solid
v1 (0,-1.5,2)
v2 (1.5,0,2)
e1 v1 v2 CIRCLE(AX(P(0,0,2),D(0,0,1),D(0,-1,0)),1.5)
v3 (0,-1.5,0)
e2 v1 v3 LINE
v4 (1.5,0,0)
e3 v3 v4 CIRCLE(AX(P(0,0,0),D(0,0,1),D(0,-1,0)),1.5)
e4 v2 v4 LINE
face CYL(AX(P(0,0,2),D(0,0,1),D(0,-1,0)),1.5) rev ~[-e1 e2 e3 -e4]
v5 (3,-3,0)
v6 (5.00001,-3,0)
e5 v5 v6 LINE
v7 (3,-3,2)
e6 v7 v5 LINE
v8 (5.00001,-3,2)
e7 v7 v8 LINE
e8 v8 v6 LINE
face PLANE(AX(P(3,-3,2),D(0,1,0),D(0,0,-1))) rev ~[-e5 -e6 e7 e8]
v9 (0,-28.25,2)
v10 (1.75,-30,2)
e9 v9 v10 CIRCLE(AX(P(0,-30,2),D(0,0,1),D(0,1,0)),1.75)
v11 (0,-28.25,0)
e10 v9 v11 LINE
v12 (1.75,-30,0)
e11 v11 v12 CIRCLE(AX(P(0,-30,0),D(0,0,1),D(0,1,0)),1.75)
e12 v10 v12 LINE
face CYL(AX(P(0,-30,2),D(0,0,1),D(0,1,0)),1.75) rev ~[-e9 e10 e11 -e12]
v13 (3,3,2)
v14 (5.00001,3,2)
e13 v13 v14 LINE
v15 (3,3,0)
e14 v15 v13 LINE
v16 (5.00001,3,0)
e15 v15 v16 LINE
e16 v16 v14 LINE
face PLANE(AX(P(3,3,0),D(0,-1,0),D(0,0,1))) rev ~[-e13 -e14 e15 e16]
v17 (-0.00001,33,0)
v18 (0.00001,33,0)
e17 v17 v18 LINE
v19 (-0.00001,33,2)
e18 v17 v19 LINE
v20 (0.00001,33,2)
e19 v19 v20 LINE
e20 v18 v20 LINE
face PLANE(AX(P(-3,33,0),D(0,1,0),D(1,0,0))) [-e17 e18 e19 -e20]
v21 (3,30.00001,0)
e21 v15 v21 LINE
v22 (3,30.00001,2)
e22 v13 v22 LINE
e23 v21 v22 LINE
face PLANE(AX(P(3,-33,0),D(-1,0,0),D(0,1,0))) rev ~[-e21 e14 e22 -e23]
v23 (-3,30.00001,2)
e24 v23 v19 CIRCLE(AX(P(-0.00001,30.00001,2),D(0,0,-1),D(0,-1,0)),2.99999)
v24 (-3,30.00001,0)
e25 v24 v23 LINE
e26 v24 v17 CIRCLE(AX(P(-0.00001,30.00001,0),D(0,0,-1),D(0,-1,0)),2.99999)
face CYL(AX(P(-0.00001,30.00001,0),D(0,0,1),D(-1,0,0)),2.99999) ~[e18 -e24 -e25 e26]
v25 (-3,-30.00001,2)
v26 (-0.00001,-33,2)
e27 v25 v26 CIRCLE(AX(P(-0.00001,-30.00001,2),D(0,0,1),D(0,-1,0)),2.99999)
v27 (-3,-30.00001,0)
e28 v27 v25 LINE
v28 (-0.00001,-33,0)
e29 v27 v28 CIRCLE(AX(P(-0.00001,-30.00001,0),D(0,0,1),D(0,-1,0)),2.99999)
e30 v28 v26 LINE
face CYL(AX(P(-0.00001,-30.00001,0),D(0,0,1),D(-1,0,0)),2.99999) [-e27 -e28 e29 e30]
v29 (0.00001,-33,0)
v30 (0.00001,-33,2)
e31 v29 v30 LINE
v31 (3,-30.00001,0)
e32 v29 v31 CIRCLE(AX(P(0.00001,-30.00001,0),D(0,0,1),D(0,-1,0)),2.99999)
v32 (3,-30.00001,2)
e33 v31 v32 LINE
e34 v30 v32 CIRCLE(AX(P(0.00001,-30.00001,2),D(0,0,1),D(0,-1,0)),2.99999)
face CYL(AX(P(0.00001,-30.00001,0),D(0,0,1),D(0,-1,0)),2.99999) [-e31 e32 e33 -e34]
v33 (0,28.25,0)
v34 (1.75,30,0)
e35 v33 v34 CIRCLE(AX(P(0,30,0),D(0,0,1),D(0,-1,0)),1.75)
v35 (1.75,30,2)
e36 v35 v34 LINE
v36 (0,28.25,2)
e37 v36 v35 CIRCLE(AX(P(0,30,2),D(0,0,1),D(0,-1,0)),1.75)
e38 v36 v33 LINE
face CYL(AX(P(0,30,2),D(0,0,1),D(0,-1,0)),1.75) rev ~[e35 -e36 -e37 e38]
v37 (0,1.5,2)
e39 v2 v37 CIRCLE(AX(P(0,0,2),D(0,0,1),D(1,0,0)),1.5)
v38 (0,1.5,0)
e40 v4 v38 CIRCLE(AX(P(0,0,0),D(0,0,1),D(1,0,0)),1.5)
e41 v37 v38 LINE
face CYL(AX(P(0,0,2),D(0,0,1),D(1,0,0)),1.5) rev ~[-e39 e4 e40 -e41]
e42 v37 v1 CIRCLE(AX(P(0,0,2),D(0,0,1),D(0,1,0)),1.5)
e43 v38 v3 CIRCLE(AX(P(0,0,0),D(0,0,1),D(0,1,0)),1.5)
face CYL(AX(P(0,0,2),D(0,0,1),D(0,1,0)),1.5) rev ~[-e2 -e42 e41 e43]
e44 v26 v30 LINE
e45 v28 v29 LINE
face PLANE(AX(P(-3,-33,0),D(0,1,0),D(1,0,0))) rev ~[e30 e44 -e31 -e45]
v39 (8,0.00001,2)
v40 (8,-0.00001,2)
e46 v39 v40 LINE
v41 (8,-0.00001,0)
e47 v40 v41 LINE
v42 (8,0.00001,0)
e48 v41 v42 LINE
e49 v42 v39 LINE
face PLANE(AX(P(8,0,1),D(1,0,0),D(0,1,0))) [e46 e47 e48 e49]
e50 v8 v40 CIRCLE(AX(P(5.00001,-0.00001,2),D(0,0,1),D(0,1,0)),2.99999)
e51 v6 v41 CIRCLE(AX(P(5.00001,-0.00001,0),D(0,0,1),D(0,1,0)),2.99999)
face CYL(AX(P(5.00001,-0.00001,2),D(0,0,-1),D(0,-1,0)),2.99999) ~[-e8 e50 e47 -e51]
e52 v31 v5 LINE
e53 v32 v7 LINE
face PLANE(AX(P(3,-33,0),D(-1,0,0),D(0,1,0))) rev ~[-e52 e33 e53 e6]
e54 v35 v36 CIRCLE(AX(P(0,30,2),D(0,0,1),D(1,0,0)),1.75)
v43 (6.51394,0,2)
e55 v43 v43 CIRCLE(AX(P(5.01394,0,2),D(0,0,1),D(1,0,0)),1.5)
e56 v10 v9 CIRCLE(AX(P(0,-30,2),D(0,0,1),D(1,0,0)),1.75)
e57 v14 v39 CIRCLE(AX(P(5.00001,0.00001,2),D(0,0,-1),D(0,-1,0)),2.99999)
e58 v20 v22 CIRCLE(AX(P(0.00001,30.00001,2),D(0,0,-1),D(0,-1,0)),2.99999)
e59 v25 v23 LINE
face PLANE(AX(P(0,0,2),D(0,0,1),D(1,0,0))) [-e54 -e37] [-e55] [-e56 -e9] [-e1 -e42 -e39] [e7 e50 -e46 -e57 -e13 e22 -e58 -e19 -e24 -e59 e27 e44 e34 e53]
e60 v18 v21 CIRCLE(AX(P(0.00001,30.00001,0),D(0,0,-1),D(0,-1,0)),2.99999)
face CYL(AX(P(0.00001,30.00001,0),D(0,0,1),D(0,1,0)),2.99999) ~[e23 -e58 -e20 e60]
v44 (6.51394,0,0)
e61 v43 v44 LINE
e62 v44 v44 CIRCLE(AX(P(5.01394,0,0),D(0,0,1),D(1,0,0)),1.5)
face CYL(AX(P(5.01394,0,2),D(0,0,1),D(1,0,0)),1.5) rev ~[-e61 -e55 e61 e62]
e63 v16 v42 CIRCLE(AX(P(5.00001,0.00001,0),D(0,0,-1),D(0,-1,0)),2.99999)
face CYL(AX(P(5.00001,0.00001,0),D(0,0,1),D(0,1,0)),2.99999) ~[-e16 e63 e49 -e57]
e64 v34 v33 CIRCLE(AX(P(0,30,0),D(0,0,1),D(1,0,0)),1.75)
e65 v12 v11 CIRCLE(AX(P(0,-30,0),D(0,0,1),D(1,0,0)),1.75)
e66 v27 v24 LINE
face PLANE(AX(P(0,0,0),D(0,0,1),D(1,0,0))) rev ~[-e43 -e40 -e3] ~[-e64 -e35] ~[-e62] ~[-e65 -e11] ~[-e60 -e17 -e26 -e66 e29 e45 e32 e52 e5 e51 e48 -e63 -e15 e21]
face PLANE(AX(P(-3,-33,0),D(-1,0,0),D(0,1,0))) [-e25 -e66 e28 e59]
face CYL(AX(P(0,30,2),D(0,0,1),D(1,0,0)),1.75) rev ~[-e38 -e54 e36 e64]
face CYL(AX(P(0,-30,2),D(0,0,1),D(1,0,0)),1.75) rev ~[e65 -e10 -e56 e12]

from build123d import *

# Parameters (mm, degrees)
F0_W     = 6
F0_H     = 66
F1_DEPTH = 2
F3_DEPTH = 2
F5_DEPTH = 5
F6_R     = 1.5
F7_DEPTH = 2
F8_R     = 2.99999


# Not quite as in the source:
# - a fillet or chamfer is up to 0.001 mm smaller than in the source, because OpenCascade refuses the exact size


with BuildPart() as f1:
    # F0 (on Top) → F1 (new body)
    with BuildSketch(Plane.XY):
        Rectangle(F0_W, F0_H)
    extrude(amount=F1_DEPTH)

    # F2 (on face) → F3 (cut, through all)
    with BuildSketch(Plane.XY.offset(2)):
        with BuildLine():
            ThreePointArc((0, -1.5), (1.0606601718, -1.0606601718), (1.5, 0))
            ThreePointArc((1.5, 0), (1.0606601718, 1.0606601718), (0, 1.5))
            Line((0, 1.5), (0, 0))
            Line((0, 0), (0, -1.5))
        make_face()
        with BuildLine():
            ThreePointArc((1.75, -30), (1.2374368671, -28.7625631329), (0, -28.25))
            ThreePointArc((0, -28.25), (-1.2374368671, -31.2374368671), (1.75, -30))
        make_face()
        with BuildLine():
            ThreePointArc((1.75, 30), (-1.2374368671, 31.2374368671), (0, 28.25))
            ThreePointArc((0, 28.25), (1.2374368671, 28.7625631329), (1.75, 30))
        make_face()
        with BuildLine():
            Line((0, 0), (0, 1.5))
            ThreePointArc((0, 1.5), (-1.5, 0), (0, -1.5))
            Line((0, -1.5), (0, 0))
        make_face()
    extrude(amount=-F3_DEPTH, mode=Mode.SUBTRACT)

    # F4 (on face) → F5 (join)
    with BuildSketch(Plane.YZ.offset(3)):
        Polygon((3, 2), (0, 2), (-3, 2), (-3, 0), (0, 0), (3, 0), align=None)
    extrude(amount=F5_DEPTH)

    # F6 (on face) → F7 (cut, through all)
    with BuildSketch(Plane.XY.offset(2)):
        with Locations((5.0139404441, 0)):
            Circle(F6_R)
    extrude(amount=-F7_DEPTH, mode=Mode.SUBTRACT)

    # F8 (radius 3 in the source; OpenCascade refuses exactly that, so slightly less here)
    f8_edges = [f1.edges().sort_by_distance(p)[0] for p in [
        (-3, -33, 1),
        (3, -33, 1),
        (3, 33, 1),
        (-3, 33, 1),
        (8, -3, 1),
        (8, 3, 1),
    ]]
    fillet(f8_edges, radius=F8_R)


solid = f1.part
